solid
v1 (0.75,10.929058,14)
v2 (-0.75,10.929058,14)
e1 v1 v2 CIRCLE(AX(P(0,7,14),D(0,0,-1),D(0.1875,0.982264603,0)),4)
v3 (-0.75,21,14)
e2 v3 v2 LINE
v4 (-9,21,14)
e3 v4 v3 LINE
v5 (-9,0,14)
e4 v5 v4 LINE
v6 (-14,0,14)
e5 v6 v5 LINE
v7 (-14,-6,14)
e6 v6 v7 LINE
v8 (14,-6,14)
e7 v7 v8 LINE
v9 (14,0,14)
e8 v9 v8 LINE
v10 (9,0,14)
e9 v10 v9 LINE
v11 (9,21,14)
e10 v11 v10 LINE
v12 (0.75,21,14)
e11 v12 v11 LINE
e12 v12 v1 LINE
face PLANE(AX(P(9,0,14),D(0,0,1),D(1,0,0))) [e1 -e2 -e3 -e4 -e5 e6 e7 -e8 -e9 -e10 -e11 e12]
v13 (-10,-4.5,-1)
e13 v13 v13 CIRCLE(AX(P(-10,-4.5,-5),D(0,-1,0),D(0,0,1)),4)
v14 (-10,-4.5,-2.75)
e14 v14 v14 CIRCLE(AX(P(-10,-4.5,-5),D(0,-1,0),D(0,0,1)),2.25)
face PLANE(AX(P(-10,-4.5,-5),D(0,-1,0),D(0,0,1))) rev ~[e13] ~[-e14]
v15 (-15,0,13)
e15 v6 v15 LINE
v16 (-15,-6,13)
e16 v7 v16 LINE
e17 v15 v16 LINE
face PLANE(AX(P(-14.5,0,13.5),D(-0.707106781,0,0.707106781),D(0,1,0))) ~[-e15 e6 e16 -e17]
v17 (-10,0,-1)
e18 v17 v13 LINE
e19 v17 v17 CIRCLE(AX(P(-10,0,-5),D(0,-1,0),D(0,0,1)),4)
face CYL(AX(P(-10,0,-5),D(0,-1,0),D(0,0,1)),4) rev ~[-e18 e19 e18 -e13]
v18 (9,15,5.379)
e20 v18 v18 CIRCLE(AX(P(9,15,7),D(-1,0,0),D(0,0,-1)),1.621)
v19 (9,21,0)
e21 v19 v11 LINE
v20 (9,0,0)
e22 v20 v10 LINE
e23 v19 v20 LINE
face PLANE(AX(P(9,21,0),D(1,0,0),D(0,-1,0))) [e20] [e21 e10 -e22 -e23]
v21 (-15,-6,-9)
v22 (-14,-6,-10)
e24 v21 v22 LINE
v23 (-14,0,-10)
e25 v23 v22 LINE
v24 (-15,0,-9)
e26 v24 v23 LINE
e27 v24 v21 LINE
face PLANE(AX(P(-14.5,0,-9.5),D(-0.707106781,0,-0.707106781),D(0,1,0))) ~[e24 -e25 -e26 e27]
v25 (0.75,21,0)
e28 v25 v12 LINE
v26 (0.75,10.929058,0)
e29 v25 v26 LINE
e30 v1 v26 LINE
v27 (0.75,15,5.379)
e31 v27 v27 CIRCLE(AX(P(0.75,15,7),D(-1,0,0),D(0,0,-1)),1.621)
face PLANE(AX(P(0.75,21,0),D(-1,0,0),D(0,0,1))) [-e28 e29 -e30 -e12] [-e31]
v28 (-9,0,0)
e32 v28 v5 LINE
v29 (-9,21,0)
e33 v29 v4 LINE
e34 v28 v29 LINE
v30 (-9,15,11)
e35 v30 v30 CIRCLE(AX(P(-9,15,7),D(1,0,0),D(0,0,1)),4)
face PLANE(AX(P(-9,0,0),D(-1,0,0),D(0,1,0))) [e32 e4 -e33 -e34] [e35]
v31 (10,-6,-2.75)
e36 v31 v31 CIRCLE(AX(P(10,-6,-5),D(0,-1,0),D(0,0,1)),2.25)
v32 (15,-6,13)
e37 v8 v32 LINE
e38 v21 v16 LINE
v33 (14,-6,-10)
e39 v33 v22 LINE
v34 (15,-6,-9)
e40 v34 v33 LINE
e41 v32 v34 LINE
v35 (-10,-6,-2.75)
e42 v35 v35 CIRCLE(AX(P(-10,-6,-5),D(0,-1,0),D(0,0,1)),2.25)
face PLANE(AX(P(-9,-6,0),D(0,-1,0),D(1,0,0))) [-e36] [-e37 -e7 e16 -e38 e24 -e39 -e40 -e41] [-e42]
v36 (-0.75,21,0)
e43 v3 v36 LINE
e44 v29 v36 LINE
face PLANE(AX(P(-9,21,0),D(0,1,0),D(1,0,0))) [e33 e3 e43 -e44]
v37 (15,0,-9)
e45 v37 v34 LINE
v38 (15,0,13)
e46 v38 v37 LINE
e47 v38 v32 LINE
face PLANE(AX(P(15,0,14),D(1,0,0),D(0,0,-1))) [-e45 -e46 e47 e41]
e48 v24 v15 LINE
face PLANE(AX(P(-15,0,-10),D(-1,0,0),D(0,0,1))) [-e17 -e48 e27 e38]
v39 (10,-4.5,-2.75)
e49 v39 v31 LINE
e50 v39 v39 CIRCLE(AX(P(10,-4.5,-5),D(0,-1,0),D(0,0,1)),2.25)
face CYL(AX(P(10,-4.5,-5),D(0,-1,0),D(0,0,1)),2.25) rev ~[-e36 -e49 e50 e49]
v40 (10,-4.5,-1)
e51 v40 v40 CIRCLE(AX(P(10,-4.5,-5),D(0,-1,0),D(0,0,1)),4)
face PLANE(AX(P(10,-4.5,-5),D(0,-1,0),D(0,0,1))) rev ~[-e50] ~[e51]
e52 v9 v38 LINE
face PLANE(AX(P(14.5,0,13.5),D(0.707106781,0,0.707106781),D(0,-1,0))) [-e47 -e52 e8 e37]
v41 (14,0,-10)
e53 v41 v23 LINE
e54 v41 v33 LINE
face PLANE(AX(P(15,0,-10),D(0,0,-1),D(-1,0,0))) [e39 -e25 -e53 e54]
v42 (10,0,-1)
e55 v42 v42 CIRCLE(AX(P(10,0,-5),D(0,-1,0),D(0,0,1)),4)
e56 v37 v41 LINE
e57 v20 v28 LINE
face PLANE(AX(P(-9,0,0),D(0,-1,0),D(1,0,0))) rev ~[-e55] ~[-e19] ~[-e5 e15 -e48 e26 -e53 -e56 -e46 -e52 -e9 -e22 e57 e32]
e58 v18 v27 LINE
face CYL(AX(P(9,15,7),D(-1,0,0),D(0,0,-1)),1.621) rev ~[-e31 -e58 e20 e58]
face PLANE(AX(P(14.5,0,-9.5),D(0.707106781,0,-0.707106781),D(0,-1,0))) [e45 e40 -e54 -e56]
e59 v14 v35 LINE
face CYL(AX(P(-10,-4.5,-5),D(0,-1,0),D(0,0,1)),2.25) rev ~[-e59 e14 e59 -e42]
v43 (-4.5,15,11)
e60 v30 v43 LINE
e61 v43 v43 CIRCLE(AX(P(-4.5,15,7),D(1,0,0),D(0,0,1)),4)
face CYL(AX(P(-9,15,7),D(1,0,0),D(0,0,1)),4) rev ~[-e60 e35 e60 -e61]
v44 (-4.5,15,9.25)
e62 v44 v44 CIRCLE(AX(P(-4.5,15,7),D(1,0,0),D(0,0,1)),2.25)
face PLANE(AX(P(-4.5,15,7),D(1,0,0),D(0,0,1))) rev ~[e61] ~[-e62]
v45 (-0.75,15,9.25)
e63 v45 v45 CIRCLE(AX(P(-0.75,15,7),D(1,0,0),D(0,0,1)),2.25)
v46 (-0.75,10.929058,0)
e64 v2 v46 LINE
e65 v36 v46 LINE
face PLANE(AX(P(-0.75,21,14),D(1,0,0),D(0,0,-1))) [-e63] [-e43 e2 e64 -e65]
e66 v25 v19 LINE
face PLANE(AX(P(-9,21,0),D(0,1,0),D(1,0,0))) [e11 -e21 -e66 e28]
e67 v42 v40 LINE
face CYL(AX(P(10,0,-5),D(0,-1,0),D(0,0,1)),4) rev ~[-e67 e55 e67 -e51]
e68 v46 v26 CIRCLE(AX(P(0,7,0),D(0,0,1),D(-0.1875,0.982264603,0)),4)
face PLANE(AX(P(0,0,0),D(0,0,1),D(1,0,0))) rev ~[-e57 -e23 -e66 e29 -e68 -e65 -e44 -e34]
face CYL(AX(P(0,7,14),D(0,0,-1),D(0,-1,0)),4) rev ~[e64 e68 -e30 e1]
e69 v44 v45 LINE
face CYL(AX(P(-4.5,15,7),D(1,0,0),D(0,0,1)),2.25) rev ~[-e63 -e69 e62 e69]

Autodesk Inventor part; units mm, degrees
ref_plane "YZ Plane" through (0, 0, 0) normal (1, 0, 0) x (0, 1, 0)
ref_plane "XZ Plane" through (0, 0, 0) normal (0, 1, 0) x (-1, 0, 0)
ref_plane "XY Plane" through (0, 0, 0) normal (0, 0, 1) x (1, 0, 0)
sketch "スケッチ1" plane through (0, 0, 0) normal (0, 0, 1) x (1, 0, 0)
  line L0 (-9, 21) -> (9, 21)
  line L1 (9, 21) -> (9, 0)
  line L2 (9, 0) -> (-9, 0)
  line L3 (-9, 0) -> (-9, 21)
  point P0 (0, 0)
  point P1 (0, 0)
  dimension "d0" = 18
  dimension "d1" = 21
extrude "押し出し1" add sketch "スケッチ1" along normal blind 14
sketch "スケッチ3" plane through (0, 0, 14) normal (0, 0, 1) x (1, 0, 0)
  line L0 (-9, 21) -> (9, 21) projected
  point P0 (0, 0)
  point P1 (0, 7)
  point P2 (0, 21)
  dimension "d41" = 14
hole "穴2" at (0, 7, 14) direction (0, 0, -1) diameter 8 end through all
sketch "スケッチ4" plane through (-9, 21, 0) normal (0, 1, 0) x (1, 0, 0)
  line L0 (0, -14) -> (18, -14) projected
  line L1 (0, 0) -> (18, 0) projected
  line L2 (8.25, 0) -> (9.75, 0)
  line L3 (9.75, 0) -> (9.75, -14)
  line L4 (9.75, -14) -> (8.25, -14)
  line L5 (8.25, -14) -> (8.25, 0)
  point P0 (9, 0)
  point P1 (9, 0)
  point P2 (9, 0)
  dimension "d21" = 1.5
extrude "押し出し2" cut sketch "スケッチ4" against normal up to surface
sketch "スケッチ5" plane through (-9, 0, 0) normal (-1, 0, 0) x (0, 0, 1)
  line L0 (0, 21) -> (14, 21) projected
  point P0 (7, 15)
  point P1 (7, 21)
  dimension "d42" = 6
hole "穴3" at (-9, 15, 7) direction (1, 0, 0) diameter 4.5 end up to surface counterbore diameter 8 counterbore depth 4.5
sketch "スケッチ6" plane through (9, 0, 0) normal (1, 0, 0) x (0, 0, -1)
  circle A0 centre (-7, 15) radius 2.25 projected
hole "穴4" at (9, 15, 7) direction (-1, 0, 0) diameter 3.242 end up to surface thread size "M4x0.7" class "6H" standard "ANSI Metric M Profile"
sketch "スケッチ9" plane through (-9, 0, 0) normal (0, -1, 0) x (1, 0, 0)
  line L0 (18, 14) -> (0, 14) projected
  line L1 (18, 0) -> (0, 0) projected
  line L2 (-6, 14) -> (24, 14)
  line L3 (24, 14) -> (24, -10)
  line L4 (24, -10) -> (-6, -10)
  line L5 (-6, -10) -> (-6, 14)
  point P0 (9, -10)
  point P1 (9, 0)
  dimension "d46" = 30
  dimension "d47" = 24
extrude "押し出し5" add sketch "スケッチ9" along normal blind 6
sketch "スケッチ10" plane through (-9, 0, 0) normal (0, 1, 0) x (1, 0, 0)
  line L0 (24, 10) -> (-6, 10) projected
  point P0 (9, 0)
  point P1 (-1, 5)
  point P2 (19, 5)
  dimension "d50" = 10
  dimension "d51" = 10
  dimension "d52" = 5
hole "穴5" at (-10, 0, -5) at (10, 0, -5) direction (0, -1, 0) diameter 4.5 end through all counterbore diameter 8 counterbore depth 4.5
chamfer "面取り1" distance 1 angle 45 4 edges at (15, -3, 14) (-15, -3, 14) (-15, -3, -10) (15, -3, -10)
equation "\"d51\" = d50"
properties part number "06" material "SUS303"
